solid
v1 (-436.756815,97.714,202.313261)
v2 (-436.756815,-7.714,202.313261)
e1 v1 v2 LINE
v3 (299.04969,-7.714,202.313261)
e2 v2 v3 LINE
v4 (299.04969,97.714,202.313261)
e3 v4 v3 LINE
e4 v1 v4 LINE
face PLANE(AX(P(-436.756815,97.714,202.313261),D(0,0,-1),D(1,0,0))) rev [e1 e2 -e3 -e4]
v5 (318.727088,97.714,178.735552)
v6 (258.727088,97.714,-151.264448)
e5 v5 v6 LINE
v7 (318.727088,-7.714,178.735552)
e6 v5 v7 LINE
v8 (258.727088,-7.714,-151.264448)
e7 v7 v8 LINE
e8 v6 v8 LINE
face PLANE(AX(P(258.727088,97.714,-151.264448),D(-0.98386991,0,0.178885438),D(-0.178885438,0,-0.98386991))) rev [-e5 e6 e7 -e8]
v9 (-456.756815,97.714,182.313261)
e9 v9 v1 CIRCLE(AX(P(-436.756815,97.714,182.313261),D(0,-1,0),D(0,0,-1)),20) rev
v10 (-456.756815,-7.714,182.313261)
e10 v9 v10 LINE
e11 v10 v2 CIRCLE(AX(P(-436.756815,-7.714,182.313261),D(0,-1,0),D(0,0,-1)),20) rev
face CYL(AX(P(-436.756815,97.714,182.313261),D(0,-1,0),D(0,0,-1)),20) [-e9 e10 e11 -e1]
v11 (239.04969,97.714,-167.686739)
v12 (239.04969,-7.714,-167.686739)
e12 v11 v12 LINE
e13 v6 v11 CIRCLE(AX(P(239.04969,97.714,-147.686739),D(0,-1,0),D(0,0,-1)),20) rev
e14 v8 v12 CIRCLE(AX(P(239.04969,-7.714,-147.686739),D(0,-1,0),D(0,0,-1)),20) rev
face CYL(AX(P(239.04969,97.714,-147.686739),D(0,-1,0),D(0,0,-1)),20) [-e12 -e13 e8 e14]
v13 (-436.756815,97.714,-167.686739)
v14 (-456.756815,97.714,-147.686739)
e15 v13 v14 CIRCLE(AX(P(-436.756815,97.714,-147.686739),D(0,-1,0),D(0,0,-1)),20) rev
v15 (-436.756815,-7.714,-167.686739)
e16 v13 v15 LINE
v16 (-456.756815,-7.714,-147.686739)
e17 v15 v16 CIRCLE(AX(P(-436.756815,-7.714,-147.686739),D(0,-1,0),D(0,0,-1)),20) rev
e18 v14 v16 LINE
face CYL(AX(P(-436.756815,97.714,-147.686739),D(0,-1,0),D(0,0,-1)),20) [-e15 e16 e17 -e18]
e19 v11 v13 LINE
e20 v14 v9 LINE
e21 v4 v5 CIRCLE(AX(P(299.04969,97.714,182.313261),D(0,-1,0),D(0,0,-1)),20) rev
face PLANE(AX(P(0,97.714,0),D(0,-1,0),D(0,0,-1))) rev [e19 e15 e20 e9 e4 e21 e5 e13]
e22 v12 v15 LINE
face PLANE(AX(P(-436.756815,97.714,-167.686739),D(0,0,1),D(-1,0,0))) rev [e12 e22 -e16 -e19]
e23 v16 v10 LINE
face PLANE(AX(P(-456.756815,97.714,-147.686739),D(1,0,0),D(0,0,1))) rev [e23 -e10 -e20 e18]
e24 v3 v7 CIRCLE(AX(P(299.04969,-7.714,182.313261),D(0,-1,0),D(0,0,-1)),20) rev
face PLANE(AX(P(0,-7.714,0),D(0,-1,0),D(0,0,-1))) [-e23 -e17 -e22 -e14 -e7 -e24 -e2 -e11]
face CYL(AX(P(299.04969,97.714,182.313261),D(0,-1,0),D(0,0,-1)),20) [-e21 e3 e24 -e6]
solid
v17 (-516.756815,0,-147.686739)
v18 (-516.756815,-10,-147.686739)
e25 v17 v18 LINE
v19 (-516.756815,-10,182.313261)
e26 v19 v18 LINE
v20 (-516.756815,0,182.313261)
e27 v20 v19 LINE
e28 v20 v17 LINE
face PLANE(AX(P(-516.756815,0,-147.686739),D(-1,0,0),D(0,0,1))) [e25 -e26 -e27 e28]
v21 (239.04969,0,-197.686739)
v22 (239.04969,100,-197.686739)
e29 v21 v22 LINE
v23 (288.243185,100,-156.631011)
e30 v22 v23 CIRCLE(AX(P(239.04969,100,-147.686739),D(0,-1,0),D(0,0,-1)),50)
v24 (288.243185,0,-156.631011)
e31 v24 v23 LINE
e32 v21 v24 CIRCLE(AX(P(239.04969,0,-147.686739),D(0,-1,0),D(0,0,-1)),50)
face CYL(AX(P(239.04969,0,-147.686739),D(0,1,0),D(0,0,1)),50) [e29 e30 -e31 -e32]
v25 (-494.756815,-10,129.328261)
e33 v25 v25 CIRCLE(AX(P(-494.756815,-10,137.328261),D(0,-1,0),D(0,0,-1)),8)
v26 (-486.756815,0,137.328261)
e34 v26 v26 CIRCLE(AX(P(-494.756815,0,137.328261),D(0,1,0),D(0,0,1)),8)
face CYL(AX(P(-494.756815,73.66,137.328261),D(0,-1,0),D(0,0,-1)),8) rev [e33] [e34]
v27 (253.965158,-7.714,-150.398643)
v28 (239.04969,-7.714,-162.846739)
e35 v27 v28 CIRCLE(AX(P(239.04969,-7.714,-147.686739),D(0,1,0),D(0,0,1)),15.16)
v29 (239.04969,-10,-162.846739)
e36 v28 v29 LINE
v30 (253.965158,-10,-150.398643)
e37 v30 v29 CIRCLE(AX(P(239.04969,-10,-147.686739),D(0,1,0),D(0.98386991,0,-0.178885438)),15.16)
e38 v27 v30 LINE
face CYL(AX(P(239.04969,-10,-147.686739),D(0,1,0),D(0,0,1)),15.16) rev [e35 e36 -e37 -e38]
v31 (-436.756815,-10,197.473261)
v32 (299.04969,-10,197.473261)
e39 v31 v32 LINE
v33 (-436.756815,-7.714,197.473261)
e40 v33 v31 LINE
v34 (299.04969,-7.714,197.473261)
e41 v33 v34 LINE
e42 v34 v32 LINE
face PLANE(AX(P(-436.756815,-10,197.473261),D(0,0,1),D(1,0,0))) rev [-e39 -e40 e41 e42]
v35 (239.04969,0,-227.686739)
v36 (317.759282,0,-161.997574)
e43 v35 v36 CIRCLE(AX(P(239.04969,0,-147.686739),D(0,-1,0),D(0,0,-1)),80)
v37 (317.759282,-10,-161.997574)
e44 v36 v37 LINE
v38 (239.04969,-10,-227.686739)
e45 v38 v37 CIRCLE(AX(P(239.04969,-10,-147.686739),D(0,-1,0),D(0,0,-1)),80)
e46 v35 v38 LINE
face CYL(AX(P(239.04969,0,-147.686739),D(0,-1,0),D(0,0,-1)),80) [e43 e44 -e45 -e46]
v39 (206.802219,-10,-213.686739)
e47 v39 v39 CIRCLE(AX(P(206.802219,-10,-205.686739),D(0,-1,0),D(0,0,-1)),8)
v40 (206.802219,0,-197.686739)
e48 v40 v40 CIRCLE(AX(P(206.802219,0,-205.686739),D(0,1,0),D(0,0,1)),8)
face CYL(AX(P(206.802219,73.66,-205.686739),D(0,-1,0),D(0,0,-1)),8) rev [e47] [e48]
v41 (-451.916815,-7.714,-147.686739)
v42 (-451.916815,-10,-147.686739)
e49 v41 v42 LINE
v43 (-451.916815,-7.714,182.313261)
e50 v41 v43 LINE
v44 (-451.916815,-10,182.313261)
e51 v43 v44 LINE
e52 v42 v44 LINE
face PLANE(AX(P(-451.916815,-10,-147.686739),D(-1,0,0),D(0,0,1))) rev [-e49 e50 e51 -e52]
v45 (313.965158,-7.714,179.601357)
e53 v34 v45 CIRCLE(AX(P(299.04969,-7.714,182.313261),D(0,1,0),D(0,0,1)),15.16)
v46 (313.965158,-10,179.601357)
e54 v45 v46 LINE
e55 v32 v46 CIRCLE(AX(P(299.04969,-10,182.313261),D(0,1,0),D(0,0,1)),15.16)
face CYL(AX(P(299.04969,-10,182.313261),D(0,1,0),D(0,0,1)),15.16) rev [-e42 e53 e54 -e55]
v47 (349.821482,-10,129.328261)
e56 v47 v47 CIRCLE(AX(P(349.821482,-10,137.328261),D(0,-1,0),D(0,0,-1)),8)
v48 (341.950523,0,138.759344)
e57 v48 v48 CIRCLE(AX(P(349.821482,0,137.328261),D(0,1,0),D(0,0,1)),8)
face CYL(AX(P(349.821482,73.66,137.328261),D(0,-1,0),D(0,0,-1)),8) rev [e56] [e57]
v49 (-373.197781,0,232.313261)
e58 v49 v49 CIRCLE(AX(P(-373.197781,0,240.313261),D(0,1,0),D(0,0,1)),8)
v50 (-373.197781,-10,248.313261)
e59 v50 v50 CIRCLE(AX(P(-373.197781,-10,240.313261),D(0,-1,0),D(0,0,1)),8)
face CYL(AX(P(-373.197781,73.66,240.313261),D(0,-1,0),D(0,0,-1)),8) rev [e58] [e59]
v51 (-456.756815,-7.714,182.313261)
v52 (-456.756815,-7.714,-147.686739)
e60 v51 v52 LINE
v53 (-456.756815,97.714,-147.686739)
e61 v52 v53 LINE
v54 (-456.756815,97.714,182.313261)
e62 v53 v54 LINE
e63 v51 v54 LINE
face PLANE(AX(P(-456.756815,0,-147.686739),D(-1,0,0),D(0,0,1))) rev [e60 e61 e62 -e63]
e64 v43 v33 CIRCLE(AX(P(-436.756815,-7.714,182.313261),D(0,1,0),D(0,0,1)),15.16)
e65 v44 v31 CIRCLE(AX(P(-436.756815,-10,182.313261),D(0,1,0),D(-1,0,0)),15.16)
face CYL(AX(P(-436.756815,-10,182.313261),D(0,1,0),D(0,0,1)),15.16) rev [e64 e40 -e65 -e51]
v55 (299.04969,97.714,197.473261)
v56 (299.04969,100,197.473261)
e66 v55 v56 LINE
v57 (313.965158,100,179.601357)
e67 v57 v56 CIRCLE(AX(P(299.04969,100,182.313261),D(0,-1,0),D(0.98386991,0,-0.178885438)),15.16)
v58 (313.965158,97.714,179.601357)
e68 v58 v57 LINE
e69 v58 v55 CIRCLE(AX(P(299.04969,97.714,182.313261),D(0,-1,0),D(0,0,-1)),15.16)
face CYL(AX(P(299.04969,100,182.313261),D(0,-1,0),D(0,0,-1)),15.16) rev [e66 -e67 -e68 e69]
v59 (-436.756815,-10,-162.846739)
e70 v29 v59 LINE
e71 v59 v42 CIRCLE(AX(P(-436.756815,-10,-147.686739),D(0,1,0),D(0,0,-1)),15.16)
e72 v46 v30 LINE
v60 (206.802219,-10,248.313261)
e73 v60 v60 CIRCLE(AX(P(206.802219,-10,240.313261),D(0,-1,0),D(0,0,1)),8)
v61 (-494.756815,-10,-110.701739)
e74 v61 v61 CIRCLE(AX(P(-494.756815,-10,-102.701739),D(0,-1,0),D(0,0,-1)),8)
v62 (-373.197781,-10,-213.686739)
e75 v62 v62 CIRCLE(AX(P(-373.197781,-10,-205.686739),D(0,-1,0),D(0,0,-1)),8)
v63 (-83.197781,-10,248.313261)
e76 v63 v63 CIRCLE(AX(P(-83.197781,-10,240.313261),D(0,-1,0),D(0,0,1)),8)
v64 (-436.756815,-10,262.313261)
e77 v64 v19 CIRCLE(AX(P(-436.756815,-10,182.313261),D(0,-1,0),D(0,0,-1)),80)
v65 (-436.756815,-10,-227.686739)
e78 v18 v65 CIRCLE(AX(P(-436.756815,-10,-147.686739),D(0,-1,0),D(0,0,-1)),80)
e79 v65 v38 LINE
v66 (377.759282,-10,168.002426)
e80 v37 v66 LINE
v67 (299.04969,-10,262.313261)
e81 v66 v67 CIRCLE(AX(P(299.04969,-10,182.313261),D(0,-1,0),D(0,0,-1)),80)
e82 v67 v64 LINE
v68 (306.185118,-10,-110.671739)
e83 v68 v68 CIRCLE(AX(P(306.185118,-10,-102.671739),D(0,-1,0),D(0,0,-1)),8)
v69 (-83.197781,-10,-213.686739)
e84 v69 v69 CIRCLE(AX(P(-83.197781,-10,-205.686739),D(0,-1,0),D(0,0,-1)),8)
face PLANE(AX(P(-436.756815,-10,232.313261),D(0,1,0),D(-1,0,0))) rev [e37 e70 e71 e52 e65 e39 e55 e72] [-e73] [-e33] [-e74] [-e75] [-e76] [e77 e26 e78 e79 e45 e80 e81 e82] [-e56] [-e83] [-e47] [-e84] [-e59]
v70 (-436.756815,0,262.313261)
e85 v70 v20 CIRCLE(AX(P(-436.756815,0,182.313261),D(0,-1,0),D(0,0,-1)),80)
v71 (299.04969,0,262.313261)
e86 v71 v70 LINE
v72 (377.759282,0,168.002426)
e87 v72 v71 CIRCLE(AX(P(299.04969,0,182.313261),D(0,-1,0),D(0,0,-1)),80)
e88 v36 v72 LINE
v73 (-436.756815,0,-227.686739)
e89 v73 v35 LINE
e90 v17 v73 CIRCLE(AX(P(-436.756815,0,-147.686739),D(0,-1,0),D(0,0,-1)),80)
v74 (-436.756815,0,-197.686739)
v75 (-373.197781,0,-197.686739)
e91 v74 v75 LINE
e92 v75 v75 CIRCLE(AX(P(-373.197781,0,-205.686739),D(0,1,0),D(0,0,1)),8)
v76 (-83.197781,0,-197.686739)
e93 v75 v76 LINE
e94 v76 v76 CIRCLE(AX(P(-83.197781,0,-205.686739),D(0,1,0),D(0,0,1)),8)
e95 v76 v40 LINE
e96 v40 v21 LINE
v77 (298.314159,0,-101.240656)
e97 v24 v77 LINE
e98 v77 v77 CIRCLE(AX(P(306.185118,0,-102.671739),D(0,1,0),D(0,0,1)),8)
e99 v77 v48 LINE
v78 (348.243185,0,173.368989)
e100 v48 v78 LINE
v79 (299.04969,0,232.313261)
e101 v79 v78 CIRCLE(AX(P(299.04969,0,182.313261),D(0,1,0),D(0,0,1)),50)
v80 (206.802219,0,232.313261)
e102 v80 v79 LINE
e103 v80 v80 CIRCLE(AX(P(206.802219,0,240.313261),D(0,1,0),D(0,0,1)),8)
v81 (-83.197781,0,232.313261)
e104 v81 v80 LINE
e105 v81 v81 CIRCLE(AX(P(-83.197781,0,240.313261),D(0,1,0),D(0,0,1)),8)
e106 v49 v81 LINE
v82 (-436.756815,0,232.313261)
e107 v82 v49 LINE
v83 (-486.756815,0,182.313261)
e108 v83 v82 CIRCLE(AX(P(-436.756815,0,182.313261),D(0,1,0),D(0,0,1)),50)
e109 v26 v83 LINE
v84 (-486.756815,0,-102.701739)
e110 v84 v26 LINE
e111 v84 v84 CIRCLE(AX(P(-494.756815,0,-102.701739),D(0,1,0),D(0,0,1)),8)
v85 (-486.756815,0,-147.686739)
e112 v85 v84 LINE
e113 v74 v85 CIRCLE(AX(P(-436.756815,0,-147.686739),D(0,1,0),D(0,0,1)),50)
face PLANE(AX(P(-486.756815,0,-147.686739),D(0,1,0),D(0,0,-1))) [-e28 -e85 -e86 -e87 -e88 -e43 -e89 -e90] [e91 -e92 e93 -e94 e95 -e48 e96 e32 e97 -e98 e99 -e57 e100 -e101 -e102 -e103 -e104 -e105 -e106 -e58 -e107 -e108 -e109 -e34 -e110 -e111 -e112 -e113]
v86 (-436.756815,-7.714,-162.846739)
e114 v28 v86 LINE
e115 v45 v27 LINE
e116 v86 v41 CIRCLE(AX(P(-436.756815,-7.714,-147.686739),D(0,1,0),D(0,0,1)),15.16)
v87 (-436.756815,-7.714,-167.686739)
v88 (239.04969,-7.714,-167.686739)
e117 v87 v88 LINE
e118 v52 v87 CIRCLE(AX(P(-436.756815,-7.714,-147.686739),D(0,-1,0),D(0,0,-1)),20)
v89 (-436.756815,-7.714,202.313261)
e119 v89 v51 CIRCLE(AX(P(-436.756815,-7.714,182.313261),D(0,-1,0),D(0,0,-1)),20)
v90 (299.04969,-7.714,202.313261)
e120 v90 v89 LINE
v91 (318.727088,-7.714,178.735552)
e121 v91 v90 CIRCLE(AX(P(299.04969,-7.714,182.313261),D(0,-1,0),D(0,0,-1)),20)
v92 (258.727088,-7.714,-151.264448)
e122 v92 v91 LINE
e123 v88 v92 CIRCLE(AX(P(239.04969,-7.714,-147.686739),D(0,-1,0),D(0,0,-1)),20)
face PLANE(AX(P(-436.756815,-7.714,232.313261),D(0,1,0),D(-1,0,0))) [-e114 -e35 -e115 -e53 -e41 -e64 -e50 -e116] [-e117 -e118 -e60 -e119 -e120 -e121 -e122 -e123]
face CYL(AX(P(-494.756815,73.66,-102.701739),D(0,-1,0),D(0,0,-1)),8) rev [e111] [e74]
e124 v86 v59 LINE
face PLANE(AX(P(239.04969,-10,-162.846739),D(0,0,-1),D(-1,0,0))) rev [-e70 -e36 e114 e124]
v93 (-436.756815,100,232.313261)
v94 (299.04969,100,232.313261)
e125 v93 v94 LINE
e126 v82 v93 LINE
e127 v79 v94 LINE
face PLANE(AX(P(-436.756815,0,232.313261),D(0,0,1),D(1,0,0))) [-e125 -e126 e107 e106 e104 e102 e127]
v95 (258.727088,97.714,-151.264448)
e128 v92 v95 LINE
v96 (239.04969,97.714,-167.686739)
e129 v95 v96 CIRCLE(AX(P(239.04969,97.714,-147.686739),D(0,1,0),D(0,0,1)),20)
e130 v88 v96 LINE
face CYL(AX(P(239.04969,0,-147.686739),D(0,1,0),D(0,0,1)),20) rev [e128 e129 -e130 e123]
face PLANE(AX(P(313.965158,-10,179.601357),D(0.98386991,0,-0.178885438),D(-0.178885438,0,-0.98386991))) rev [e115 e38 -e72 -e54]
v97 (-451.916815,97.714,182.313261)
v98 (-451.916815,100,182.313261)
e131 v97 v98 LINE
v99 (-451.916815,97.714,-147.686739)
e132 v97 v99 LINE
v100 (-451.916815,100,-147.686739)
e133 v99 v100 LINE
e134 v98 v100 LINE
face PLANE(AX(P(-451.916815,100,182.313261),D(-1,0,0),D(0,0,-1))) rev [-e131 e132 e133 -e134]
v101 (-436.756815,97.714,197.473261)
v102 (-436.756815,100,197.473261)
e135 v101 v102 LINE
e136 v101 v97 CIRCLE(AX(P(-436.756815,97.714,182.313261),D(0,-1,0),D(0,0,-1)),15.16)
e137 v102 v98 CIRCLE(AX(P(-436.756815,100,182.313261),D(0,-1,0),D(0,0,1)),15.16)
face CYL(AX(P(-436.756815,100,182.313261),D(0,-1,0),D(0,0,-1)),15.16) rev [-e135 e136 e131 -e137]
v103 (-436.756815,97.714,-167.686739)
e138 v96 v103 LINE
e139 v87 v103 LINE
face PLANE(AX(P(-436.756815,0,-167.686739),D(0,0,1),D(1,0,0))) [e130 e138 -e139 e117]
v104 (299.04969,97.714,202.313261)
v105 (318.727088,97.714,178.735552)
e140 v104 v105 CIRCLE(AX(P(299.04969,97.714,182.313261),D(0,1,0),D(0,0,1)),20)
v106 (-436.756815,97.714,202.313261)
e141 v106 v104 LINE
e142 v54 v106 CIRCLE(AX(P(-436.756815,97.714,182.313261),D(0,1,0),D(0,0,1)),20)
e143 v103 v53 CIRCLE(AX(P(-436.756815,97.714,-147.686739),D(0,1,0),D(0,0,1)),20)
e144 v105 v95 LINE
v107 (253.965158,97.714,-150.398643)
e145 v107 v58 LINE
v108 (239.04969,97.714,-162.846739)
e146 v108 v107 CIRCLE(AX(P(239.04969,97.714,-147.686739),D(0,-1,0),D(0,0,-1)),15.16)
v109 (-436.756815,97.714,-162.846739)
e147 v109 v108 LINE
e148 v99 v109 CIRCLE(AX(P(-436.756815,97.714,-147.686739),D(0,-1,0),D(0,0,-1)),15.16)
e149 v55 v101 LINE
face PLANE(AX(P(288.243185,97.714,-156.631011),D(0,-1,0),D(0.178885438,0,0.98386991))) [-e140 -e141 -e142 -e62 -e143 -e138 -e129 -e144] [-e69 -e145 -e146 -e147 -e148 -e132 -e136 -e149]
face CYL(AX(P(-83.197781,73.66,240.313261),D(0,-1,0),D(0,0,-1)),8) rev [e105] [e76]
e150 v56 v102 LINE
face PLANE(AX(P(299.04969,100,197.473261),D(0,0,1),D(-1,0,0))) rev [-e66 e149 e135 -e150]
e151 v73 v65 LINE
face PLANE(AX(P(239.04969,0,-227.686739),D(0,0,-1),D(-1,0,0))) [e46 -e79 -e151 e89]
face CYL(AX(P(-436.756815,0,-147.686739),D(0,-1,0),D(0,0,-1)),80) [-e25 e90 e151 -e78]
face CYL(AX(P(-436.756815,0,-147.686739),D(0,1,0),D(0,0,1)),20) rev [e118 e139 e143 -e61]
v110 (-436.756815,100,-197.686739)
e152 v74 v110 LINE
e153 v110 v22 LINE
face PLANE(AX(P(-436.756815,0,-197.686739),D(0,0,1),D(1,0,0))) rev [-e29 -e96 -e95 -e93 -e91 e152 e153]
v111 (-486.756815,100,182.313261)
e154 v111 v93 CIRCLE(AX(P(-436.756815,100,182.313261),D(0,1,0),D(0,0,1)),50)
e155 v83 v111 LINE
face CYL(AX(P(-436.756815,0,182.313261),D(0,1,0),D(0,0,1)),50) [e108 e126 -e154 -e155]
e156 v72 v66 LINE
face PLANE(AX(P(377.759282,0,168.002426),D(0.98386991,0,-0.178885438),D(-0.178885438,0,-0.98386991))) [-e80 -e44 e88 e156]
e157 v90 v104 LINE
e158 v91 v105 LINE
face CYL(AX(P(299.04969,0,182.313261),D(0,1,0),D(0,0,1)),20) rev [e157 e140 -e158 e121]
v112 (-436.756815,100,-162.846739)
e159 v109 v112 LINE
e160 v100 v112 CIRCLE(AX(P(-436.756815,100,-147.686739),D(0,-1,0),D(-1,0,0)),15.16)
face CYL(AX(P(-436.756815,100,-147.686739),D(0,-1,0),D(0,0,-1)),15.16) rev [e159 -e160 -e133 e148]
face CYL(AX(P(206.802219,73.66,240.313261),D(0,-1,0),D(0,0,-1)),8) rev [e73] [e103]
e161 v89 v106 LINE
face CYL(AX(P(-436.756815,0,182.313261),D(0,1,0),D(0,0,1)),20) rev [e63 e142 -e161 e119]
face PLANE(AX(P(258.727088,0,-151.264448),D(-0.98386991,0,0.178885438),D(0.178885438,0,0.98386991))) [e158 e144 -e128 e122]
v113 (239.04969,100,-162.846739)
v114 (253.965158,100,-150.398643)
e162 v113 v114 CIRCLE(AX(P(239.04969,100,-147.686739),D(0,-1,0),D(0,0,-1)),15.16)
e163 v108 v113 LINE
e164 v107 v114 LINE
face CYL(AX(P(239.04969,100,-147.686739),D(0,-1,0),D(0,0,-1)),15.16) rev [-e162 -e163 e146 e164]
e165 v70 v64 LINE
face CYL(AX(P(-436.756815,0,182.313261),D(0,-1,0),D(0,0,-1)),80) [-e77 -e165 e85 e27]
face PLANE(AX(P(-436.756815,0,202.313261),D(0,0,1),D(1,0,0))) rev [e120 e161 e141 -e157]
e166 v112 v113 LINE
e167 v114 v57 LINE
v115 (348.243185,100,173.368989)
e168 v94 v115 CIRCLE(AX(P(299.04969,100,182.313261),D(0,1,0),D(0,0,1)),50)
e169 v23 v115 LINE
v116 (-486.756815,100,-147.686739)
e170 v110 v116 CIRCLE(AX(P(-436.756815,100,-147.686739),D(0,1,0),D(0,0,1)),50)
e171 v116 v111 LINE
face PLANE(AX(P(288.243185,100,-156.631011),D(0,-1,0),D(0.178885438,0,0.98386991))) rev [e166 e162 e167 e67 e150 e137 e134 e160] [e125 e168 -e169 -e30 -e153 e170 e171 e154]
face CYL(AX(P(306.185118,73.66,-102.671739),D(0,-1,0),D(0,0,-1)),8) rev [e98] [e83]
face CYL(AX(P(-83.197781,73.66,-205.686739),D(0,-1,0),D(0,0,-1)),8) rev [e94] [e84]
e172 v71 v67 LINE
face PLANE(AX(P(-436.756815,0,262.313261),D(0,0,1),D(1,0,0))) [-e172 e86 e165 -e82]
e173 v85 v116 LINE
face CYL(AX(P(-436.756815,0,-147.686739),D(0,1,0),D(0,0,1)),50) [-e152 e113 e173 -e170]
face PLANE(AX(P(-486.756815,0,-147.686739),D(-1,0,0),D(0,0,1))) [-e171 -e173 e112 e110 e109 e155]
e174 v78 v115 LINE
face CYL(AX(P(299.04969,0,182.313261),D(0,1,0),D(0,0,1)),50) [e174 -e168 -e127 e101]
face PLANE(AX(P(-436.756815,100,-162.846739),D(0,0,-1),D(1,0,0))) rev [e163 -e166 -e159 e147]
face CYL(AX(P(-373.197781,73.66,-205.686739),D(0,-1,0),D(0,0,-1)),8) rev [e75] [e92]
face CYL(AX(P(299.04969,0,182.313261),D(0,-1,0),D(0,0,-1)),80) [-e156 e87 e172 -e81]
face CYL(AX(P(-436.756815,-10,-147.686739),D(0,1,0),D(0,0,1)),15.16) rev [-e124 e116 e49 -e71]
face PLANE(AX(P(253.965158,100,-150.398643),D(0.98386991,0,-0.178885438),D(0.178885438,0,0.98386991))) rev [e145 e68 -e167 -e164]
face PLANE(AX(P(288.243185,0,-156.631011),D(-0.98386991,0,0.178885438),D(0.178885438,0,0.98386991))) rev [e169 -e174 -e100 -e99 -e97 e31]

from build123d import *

# Parameters (mm, degrees)
SURFACE_EXTRUDE1_1_DEPTH = 100
THICKEN1_T1              = 30
SURFACE_EXTRUDE5_2_DEPTH = 10.000000066
THICKEN4_T1              = 29.999999944
THICKEN4_T2              = 29.999999944
SKETCH10_R               = 8
CUT_EXTRUDE1_DEPTH       = 83.660000066
THICKEN7_START           = 97.714
THICKEN7_DEPTH           = 2.286
THICKEN8_START           = -10.000000066
THICKEN8_DEPTH           = 2.286
THICKEN9_START           = -7.713999964
THICKEN9_DEPTH           = 105.427999964


# Read off the part's stored shape, not the designer's step: Thicken7, Thicken8, Thicken9
with BuildPart() as body_1:
    # Surface-Extrude1: a surface, the sketch's curves swept straight by 100 mm
    with BuildLine(Plane(origin=(0, 0, 0), x_dir=(1, 0, 0), z_dir=(0, 1, 0)), mode=Mode.PRIVATE) as surface_extrude1_1_path:
        Line((-486.756814761, 147.686739346), (-486.756814761, -182.313260654))
        ThreePointArc((-486.756814761, -182.313260654), (-472.112153821, -217.668599714), (-436.756814761, -232.313260654))
        Line((-436.756814761, -232.313260654), (299.049689734, -232.313260654))
        ThreePointArc((299.049689734, -232.313260654), (337.43727624, -214.350632617), (348.243185239, -173.368988744))
        Line((348.243185239, -173.368988744), (288.243185239, 156.631011256))
        ThreePointArc((288.243185239, 156.631011256), (271.087061696, 186.074325852), (239.049689734, 197.686739346))
        Line((239.049689734, 197.686739346), (-436.756814761, 197.686739346))
        ThreePointArc((-436.756814761, 197.686739346), (-472.112153821, 183.042078405), (-486.756814761, 147.686739346))
    surface_extrude1_1 = Shell.extrude(surface_extrude1_1_path.wire(), (0 * SURFACE_EXTRUDE1_1_DEPTH, 1 * SURFACE_EXTRUDE1_1_DEPTH, 0 * SURFACE_EXTRUDE1_1_DEPTH))
    add(Solid.thicken(surface_extrude1_1, THICKEN1_T1))

    # Surface-Extrude5: a surface, the sketch's curves swept straight by 10.000000066 mm
    with BuildLine(Plane.XZ, mode=Mode.PRIVATE) as surface_extrude5_2_path:
        Line((-436.756814761, 232.313260654), (299.049689734, 232.313260654))
        ThreePointArc((299.049689734, 232.313260654), (337.43727624, 214.350632617), (348.243185239, 173.368988744))
        Line((348.243185239, 173.368988744), (288.243185239, -156.631011256))
        ThreePointArc((288.243185239, -156.631011256), (271.087061696, -186.074325852), (239.049689734, -197.686739346))
        Line((239.049689734, -197.686739346), (-436.756814761, -197.686739346))
        ThreePointArc((-436.756814761, -197.686739346), (-472.112153821, -183.042078405), (-486.756814761, -147.686739346))
        Line((-486.756814761, -147.686739346), (-486.756814761, 182.313260654))
        ThreePointArc((-486.756814761, 182.313260654), (-472.112153821, 217.668599714), (-436.756814761, 232.313260654))
    surface_extrude5_2 = Shell.extrude(surface_extrude5_2_path.wire(), (0 * SURFACE_EXTRUDE5_2_DEPTH, -1 * SURFACE_EXTRUDE5_2_DEPTH, 0 * SURFACE_EXTRUDE5_2_DEPTH))
    add(Solid.thicken(surface_extrude5_2, THICKEN4_T1))
    add(Solid.thicken(surface_extrude5_2, -THICKEN4_T2))

    # Sketch10 → Cut-Extrude1 (cut)
    with BuildSketch(Plane.XZ.offset(10.000000066)):
        with Locations(Location((206.802218777, -205.686739346, 0), (0, 0, 270))):
            Circle(SKETCH10_R)
        with Locations(Location((-83.197781105, -205.686739346, 0), (0, 0, 270))):
            Circle(SKETCH10_R)
        with Locations(Location((-373.197780987, -205.686739346, 0), (0, 0, 270))):
            Circle(SKETCH10_R)
        with Locations(Location((-494.756814761, -102.701739346, 0), (0, 0, 270))):
            Circle(SKETCH10_R)
        with Locations(Location((-494.756814761, 137.328260654, 0), (0, 0, 270))):
            Circle(SKETCH10_R)
        with Locations(Location((306.185118221, -102.671739406, 0), (0, 0, 270))):
            Circle(SKETCH10_R)
        with Locations(Location((349.821481868, 137.328260654, 0), (0, 0, 270))):
            Circle(SKETCH10_R)
        with Locations(Location((-83.197781105, 240.313260654, 0), (0, 0, 270))):
            Circle(SKETCH10_R)
        with Locations(Location((-373.197780987, 240.313260654, 0), (0, 0, 270))):
            Circle(SKETCH10_R)
        with Locations(Location((206.802218777, 240.313260654, 0), (0, 0, 270))):
            Circle(SKETCH10_R)
    extrude(amount=-CUT_EXTRUDE1_DEPTH, mode=Mode.SUBTRACT)

    # Thicken7 outline → Thicken7 (add)
    with BuildSketch(Plane(origin=(0, 0, 0), x_dir=(1, 0, 0), z_dir=(0, 1, 0)).offset(THICKEN7_START)):
        with BuildLine():
            Line((-436.756814761, -202.313260654), (299.049689734, -202.313260654))
            ThreePointArc((299.049689734, -202.313260654), (314.404724336, -195.128209439), (318.727087936, -178.73555189))
            Line((318.727087936, -178.73555189), (258.727087936, 151.26444811))
            ThreePointArc((258.727087936, 151.26444811), (251.864638519, 163.041773948), (239.049689734, 167.686739346))
            Line((239.049689734, 167.686739346), (-436.756814761, 167.686739346))
            ThreePointArc((-436.756814761, 167.686739346), (-450.898950384, 161.828874969), (-456.756814761, 147.686739346))
            Line((-456.756814761, 147.686739346), (-456.756814761, -182.313260654))
            ThreePointArc((-456.756814761, -182.313260654), (-450.898950385, -196.455396278), (-436.756814761, -202.313260654))
        make_face()
        with BuildLine():
            Line((299.049689734, -197.473260654), (-436.756814761, -197.473260654))
            ThreePointArc((-436.756814761, -197.473260654), (-447.476553564, -193.032999457), (-451.916814761, -182.313260654))
            Line((-451.916814761, -182.313260654), (-451.916814761, 147.686739346))
            ThreePointArc((-451.916814761, 147.686739346), (-447.476553564, 158.406478149), (-436.756814761, 162.846739346))
            Line((-436.756814761, 162.846739346), (239.049689734, 162.846739346))
            ThreePointArc((239.049689734, 162.846739346), (248.763420913, 159.325855574), (253.965157571, 150.398642589))
            Line((253.965157571, 150.398642589), (313.965157571, -179.601357411))
            ThreePointArc((313.965157571, -179.601357411), (310.688805962, -192.026991833), (299.049689734, -197.473260654))
        make_face(mode=Mode.SUBTRACT)
    extrude(amount=THICKEN7_DEPTH)

    # Thicken8 outline → Thicken8 (add)
    with BuildSketch(Plane(origin=(0, 0, 0), x_dir=(1, 0, 0), z_dir=(0, 1, 0)).offset(THICKEN8_START)):
        with BuildLine():
            Line((-436.756814761, -202.313260654), (299.049689734, -202.313260654))
            ThreePointArc((299.049689734, -202.313260654), (314.404724336, -195.128209439), (318.727087936, -178.73555189))
            Line((318.727087936, -178.73555189), (258.727087936, 151.26444811))
            ThreePointArc((258.727087936, 151.26444811), (251.864638519, 163.041773948), (239.049689734, 167.686739346))
            Line((239.049689734, 167.686739346), (-436.756814761, 167.686739346))
            ThreePointArc((-436.756814761, 167.686739346), (-450.898950384, 161.828874969), (-456.756814761, 147.686739346))
            Line((-456.756814761, 147.686739346), (-456.756814761, -182.313260654))
            ThreePointArc((-456.756814761, -182.313260654), (-450.898950385, -196.455396278), (-436.756814761, -202.313260654))
        make_face()
        with BuildLine():
            ThreePointArc((-436.756814761, -197.473260738), (-447.476553623, -193.032999517), (-451.916814845, -182.313260654))
            Line((-451.916814845, -182.313260654), (-451.916814845, 147.686739346))
            ThreePointArc((-451.916814845, 147.686739346), (-447.476553623, 158.406478208), (-436.756814761, 162.84673943))
            Line((-436.756814761, 162.84673943), (239.049689734, 162.84673943))
            ThreePointArc((239.049689734, 162.84673943), (248.763420967, 159.325855639), (253.965157654, 150.398642604))
            Line((253.965157654, 150.398642604), (313.965157654, -179.601357396))
            ThreePointArc((313.965157654, -179.601357396), (310.688806027, -192.026991887), (299.049689734, -197.473260738))
            Line((299.049689734, -197.473260738), (-436.756814761, -197.473260738))
        make_face(mode=Mode.SUBTRACT)
    extrude(amount=THICKEN8_DEPTH)


with BuildPart() as body_2:
    # Thicken9 outline → Thicken9 (new body)
    with BuildSketch(Plane(origin=(0, 0, 0), x_dir=(1, 0, 0), z_dir=(0, 1, 0)).offset(THICKEN9_START)):
        with BuildLine():
            ThreePointArc((258.727087936, 151.26444811), (251.864638519, 163.041773948), (239.049689734, 167.686739346))
            Line((239.049689734, 167.686739346), (-436.756814761, 167.686739346))
            ThreePointArc((-436.756814761, 167.686739346), (-450.898950384, 161.828874969), (-456.756814761, 147.686739346))
            Line((-456.756814761, 147.686739346), (-456.756814761, -182.313260654))
            ThreePointArc((-456.756814761, -182.313260654), (-450.898950385, -196.455396278), (-436.756814761, -202.313260654))
            Line((-436.756814761, -202.313260654), (299.049689734, -202.313260654))
            ThreePointArc((299.049689734, -202.313260654), (314.404724336, -195.128209439), (318.727087936, -178.73555189))
            Line((318.727087936, -178.73555189), (258.727087936, 151.26444811))
        make_face()
    extrude(amount=THICKEN9_DEPTH)


solid = Compound([body_1.part, body_2.part])
